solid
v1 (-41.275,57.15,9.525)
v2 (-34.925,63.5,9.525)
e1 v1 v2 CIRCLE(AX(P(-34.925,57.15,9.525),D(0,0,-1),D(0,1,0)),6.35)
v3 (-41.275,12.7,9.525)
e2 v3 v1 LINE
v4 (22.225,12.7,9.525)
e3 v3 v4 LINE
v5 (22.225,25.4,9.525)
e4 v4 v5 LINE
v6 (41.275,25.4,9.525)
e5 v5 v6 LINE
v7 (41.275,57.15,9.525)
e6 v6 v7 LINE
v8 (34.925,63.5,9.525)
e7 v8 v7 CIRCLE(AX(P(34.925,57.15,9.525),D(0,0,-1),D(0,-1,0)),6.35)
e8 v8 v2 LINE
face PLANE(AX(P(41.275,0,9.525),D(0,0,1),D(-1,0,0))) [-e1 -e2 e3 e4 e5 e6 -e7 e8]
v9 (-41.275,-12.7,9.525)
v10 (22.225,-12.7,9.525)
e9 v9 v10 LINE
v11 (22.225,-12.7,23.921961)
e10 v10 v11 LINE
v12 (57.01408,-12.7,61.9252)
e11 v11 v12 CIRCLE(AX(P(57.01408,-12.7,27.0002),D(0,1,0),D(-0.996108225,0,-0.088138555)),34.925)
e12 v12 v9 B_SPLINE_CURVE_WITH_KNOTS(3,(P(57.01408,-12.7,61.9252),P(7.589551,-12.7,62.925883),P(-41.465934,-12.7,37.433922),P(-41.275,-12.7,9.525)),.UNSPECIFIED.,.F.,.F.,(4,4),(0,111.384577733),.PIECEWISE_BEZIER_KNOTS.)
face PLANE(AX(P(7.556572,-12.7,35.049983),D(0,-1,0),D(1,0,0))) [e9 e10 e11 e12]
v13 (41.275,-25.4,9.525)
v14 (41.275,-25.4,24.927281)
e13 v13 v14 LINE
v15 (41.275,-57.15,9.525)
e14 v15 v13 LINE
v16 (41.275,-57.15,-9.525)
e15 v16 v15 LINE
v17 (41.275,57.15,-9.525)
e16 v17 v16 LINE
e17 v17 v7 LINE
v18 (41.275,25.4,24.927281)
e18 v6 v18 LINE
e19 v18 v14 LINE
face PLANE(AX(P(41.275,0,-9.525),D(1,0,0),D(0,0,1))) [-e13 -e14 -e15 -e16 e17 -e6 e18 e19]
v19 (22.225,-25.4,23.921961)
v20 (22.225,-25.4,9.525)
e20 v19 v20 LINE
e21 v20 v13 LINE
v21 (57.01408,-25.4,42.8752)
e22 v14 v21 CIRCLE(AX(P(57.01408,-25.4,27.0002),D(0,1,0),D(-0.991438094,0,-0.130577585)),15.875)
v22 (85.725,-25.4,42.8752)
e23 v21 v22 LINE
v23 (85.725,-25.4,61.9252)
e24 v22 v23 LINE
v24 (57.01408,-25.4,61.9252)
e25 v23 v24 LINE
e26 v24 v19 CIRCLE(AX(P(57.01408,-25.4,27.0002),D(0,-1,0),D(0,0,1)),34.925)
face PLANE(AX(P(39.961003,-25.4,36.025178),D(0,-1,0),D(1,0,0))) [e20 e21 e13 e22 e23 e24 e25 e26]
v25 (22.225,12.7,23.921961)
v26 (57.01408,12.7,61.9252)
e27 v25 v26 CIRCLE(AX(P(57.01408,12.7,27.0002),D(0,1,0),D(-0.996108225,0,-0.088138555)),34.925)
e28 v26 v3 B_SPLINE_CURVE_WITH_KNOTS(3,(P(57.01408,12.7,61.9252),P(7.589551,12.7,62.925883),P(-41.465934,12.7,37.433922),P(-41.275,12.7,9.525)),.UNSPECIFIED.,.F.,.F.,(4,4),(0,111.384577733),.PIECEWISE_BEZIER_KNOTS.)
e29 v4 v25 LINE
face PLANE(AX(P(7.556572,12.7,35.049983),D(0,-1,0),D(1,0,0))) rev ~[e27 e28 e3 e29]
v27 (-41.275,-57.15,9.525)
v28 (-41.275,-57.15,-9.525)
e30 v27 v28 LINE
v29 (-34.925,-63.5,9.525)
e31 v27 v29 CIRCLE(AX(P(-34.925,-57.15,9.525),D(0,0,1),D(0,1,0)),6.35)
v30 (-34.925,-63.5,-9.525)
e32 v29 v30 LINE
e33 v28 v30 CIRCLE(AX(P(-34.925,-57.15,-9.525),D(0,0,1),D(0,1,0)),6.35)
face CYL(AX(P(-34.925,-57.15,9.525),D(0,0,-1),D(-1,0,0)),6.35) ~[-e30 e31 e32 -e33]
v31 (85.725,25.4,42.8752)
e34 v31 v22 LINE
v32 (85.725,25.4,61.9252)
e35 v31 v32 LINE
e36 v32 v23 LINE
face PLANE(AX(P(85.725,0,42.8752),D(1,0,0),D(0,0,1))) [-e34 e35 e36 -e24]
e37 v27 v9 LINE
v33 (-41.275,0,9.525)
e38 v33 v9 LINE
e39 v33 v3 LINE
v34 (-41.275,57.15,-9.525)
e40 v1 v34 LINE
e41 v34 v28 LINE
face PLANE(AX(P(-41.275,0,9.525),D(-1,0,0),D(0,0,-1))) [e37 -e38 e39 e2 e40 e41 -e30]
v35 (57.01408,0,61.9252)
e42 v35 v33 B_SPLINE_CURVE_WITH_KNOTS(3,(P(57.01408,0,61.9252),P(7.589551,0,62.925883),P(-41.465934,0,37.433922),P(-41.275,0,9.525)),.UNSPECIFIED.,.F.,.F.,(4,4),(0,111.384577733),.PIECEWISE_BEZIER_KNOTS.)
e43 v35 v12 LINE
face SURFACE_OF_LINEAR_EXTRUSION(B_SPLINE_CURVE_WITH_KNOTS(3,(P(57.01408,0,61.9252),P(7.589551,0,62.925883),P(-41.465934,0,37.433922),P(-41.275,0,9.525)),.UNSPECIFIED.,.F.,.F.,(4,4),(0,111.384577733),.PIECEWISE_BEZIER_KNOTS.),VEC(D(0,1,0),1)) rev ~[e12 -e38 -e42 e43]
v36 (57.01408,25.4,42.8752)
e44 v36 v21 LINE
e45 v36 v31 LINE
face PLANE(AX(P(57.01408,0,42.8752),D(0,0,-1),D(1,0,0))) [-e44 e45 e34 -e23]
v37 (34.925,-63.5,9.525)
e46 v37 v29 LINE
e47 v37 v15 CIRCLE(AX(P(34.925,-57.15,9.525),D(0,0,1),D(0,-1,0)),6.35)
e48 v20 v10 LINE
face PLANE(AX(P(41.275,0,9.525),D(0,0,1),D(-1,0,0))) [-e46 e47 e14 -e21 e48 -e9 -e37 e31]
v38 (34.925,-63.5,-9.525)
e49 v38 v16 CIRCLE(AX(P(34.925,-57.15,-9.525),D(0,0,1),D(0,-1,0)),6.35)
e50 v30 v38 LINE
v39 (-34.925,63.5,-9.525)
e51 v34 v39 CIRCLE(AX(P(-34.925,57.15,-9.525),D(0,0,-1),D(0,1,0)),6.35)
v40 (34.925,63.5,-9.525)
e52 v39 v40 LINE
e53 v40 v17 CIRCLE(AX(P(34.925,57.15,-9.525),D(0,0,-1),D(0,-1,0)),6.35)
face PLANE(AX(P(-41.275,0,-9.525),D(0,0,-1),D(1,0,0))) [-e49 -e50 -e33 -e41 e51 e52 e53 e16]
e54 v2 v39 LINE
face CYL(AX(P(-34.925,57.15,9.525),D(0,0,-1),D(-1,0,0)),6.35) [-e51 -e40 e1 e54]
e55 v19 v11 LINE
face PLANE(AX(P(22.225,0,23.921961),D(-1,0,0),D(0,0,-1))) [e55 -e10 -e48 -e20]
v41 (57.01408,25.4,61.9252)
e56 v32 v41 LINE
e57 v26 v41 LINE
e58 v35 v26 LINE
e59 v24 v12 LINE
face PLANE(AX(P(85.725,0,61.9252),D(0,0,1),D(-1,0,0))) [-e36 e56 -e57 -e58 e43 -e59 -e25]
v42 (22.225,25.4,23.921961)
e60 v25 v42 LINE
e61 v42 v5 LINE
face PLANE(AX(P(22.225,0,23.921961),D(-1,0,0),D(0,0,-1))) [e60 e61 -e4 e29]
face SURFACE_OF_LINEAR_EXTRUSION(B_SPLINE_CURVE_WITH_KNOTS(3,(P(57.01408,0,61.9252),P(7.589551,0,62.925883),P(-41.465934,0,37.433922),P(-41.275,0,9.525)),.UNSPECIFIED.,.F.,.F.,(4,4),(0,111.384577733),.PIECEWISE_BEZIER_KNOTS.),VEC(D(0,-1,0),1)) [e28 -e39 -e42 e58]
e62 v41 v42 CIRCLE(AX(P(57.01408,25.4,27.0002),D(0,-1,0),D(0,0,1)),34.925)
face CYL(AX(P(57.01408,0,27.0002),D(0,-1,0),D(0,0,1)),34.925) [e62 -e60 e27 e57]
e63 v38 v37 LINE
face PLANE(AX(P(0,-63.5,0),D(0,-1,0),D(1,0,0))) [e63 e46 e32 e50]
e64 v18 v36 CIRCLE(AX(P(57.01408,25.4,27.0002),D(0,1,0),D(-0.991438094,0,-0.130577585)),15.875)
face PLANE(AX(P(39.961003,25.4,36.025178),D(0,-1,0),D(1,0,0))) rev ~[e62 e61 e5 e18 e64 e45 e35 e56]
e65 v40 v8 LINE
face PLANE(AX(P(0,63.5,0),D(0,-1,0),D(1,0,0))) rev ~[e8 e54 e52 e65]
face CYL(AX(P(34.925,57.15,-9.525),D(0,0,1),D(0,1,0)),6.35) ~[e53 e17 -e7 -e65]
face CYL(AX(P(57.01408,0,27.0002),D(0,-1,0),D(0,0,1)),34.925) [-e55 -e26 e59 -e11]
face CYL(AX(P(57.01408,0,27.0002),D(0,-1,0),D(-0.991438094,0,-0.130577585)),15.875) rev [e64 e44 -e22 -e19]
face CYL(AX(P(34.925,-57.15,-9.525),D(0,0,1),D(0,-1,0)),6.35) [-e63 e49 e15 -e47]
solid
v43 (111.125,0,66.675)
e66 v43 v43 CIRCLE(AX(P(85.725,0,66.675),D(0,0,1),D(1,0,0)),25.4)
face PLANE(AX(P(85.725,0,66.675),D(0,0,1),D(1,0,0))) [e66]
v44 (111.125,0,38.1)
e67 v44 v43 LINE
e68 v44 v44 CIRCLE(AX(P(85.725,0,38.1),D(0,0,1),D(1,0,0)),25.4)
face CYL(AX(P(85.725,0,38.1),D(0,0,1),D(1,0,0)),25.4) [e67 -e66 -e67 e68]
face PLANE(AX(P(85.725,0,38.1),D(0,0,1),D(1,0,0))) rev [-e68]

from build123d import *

# Parameters (mm, degrees)
F1_DEPTH = 63.5
F0_W     = 25.4
F0_H     = 19.05
F2_DEPTH = 25.4
F3_DEPTH = 12.7
F5_R     = 6.35


# Not quite as in the source:
# - a feature names something its author has since deleted; it is built from what else it names


with BuildPart() as f1:
    # F0 (on Front) → F1 (new body, symmetric)
    with BuildSketch(Plane.XZ):
        Polygon((-41.275, 9.525), (-41.275, -9.525), (41.275, -9.525), (41.275, 9.525), (22.225, 9.525), align=None)
    extrude(amount=F1_DEPTH, both=True)

    # F0 (on Front) → F2 (join, symmetric)
    with BuildSketch(Plane.XZ):
        with BuildLine():
            Line((22.225, 9.525), (41.275, 9.525))
            Line((41.275, 9.525), (41.275, 24.9272808433))
            ThreePointArc((41.275, 24.9272808433), (45.0783515165, 37.4670054674), (57.0140797434, 42.8752))
            Line((57.0140797434, 42.8752), (60.325, 42.8752))
            Line((60.325, 42.8752), (60.325, 61.9252))
            Line((60.325, 61.9252), (57.0140797434, 61.9252))
            ThreePointArc((57.0140797434, 61.9252), (31.2530323697, 50.5824828244), (22.225, 23.9219609569))
            Line((22.225, 23.9219609569), (22.225, 9.525))
        make_face()
        with Locations((73.025, 52.4002)):
            Rectangle(F0_W, F0_H)
    extrude(amount=F2_DEPTH, both=True)

    # F0 (on Front) → F3 (join, symmetric)
    with BuildSketch(Plane.XZ):
        with BuildLine():
            add(Edge.make_bspline(
                [(57.0140797434, 61.9252), (7.5895511545, 62.9258826375), (-41.465934366, 37.4339222908), (-41.275, 9.525)],
                knots=[0, 0, 0, 0, 111.3845777334, 111.3845777334, 111.3845777334, 111.3845777334], degree=3))
            Line((-41.275, 9.525), (22.225, 9.525))
            Line((22.225, 9.525), (22.225, 23.9219609569))
            ThreePointArc((22.225, 23.9219609569), (31.2530323697, 50.5824828244), (57.0140797434, 61.9252))
        make_face()
    extrude(amount=F3_DEPTH, both=True)

    # F5
    f5_edges = [f1.edges().sort_by_distance(p)[0] for p in [
        (41.275, -63.5, 0),
        (-41.275, -63.5, 0),
        (-41.275, 63.5, 0),
        (41.275, 63.5, 0),
    ]]
    fillet(f5_edges, radius=F5_R)


with BuildPart() as f4:
    # F0 (on Front) → F4 (revolve)
    with BuildSketch(Plane.XZ):
        Polygon((85.725, 66.675), (85.725, 61.9252), (85.725, 42.8752), (85.725, 38.1), (111.125, 38.1), (111.125, 66.675), align=None)
    revolve(axis=Axis((85.725, 0, 52.3875), (0, 0, 1)))


solid = Compound([f1.part, f4.part])
